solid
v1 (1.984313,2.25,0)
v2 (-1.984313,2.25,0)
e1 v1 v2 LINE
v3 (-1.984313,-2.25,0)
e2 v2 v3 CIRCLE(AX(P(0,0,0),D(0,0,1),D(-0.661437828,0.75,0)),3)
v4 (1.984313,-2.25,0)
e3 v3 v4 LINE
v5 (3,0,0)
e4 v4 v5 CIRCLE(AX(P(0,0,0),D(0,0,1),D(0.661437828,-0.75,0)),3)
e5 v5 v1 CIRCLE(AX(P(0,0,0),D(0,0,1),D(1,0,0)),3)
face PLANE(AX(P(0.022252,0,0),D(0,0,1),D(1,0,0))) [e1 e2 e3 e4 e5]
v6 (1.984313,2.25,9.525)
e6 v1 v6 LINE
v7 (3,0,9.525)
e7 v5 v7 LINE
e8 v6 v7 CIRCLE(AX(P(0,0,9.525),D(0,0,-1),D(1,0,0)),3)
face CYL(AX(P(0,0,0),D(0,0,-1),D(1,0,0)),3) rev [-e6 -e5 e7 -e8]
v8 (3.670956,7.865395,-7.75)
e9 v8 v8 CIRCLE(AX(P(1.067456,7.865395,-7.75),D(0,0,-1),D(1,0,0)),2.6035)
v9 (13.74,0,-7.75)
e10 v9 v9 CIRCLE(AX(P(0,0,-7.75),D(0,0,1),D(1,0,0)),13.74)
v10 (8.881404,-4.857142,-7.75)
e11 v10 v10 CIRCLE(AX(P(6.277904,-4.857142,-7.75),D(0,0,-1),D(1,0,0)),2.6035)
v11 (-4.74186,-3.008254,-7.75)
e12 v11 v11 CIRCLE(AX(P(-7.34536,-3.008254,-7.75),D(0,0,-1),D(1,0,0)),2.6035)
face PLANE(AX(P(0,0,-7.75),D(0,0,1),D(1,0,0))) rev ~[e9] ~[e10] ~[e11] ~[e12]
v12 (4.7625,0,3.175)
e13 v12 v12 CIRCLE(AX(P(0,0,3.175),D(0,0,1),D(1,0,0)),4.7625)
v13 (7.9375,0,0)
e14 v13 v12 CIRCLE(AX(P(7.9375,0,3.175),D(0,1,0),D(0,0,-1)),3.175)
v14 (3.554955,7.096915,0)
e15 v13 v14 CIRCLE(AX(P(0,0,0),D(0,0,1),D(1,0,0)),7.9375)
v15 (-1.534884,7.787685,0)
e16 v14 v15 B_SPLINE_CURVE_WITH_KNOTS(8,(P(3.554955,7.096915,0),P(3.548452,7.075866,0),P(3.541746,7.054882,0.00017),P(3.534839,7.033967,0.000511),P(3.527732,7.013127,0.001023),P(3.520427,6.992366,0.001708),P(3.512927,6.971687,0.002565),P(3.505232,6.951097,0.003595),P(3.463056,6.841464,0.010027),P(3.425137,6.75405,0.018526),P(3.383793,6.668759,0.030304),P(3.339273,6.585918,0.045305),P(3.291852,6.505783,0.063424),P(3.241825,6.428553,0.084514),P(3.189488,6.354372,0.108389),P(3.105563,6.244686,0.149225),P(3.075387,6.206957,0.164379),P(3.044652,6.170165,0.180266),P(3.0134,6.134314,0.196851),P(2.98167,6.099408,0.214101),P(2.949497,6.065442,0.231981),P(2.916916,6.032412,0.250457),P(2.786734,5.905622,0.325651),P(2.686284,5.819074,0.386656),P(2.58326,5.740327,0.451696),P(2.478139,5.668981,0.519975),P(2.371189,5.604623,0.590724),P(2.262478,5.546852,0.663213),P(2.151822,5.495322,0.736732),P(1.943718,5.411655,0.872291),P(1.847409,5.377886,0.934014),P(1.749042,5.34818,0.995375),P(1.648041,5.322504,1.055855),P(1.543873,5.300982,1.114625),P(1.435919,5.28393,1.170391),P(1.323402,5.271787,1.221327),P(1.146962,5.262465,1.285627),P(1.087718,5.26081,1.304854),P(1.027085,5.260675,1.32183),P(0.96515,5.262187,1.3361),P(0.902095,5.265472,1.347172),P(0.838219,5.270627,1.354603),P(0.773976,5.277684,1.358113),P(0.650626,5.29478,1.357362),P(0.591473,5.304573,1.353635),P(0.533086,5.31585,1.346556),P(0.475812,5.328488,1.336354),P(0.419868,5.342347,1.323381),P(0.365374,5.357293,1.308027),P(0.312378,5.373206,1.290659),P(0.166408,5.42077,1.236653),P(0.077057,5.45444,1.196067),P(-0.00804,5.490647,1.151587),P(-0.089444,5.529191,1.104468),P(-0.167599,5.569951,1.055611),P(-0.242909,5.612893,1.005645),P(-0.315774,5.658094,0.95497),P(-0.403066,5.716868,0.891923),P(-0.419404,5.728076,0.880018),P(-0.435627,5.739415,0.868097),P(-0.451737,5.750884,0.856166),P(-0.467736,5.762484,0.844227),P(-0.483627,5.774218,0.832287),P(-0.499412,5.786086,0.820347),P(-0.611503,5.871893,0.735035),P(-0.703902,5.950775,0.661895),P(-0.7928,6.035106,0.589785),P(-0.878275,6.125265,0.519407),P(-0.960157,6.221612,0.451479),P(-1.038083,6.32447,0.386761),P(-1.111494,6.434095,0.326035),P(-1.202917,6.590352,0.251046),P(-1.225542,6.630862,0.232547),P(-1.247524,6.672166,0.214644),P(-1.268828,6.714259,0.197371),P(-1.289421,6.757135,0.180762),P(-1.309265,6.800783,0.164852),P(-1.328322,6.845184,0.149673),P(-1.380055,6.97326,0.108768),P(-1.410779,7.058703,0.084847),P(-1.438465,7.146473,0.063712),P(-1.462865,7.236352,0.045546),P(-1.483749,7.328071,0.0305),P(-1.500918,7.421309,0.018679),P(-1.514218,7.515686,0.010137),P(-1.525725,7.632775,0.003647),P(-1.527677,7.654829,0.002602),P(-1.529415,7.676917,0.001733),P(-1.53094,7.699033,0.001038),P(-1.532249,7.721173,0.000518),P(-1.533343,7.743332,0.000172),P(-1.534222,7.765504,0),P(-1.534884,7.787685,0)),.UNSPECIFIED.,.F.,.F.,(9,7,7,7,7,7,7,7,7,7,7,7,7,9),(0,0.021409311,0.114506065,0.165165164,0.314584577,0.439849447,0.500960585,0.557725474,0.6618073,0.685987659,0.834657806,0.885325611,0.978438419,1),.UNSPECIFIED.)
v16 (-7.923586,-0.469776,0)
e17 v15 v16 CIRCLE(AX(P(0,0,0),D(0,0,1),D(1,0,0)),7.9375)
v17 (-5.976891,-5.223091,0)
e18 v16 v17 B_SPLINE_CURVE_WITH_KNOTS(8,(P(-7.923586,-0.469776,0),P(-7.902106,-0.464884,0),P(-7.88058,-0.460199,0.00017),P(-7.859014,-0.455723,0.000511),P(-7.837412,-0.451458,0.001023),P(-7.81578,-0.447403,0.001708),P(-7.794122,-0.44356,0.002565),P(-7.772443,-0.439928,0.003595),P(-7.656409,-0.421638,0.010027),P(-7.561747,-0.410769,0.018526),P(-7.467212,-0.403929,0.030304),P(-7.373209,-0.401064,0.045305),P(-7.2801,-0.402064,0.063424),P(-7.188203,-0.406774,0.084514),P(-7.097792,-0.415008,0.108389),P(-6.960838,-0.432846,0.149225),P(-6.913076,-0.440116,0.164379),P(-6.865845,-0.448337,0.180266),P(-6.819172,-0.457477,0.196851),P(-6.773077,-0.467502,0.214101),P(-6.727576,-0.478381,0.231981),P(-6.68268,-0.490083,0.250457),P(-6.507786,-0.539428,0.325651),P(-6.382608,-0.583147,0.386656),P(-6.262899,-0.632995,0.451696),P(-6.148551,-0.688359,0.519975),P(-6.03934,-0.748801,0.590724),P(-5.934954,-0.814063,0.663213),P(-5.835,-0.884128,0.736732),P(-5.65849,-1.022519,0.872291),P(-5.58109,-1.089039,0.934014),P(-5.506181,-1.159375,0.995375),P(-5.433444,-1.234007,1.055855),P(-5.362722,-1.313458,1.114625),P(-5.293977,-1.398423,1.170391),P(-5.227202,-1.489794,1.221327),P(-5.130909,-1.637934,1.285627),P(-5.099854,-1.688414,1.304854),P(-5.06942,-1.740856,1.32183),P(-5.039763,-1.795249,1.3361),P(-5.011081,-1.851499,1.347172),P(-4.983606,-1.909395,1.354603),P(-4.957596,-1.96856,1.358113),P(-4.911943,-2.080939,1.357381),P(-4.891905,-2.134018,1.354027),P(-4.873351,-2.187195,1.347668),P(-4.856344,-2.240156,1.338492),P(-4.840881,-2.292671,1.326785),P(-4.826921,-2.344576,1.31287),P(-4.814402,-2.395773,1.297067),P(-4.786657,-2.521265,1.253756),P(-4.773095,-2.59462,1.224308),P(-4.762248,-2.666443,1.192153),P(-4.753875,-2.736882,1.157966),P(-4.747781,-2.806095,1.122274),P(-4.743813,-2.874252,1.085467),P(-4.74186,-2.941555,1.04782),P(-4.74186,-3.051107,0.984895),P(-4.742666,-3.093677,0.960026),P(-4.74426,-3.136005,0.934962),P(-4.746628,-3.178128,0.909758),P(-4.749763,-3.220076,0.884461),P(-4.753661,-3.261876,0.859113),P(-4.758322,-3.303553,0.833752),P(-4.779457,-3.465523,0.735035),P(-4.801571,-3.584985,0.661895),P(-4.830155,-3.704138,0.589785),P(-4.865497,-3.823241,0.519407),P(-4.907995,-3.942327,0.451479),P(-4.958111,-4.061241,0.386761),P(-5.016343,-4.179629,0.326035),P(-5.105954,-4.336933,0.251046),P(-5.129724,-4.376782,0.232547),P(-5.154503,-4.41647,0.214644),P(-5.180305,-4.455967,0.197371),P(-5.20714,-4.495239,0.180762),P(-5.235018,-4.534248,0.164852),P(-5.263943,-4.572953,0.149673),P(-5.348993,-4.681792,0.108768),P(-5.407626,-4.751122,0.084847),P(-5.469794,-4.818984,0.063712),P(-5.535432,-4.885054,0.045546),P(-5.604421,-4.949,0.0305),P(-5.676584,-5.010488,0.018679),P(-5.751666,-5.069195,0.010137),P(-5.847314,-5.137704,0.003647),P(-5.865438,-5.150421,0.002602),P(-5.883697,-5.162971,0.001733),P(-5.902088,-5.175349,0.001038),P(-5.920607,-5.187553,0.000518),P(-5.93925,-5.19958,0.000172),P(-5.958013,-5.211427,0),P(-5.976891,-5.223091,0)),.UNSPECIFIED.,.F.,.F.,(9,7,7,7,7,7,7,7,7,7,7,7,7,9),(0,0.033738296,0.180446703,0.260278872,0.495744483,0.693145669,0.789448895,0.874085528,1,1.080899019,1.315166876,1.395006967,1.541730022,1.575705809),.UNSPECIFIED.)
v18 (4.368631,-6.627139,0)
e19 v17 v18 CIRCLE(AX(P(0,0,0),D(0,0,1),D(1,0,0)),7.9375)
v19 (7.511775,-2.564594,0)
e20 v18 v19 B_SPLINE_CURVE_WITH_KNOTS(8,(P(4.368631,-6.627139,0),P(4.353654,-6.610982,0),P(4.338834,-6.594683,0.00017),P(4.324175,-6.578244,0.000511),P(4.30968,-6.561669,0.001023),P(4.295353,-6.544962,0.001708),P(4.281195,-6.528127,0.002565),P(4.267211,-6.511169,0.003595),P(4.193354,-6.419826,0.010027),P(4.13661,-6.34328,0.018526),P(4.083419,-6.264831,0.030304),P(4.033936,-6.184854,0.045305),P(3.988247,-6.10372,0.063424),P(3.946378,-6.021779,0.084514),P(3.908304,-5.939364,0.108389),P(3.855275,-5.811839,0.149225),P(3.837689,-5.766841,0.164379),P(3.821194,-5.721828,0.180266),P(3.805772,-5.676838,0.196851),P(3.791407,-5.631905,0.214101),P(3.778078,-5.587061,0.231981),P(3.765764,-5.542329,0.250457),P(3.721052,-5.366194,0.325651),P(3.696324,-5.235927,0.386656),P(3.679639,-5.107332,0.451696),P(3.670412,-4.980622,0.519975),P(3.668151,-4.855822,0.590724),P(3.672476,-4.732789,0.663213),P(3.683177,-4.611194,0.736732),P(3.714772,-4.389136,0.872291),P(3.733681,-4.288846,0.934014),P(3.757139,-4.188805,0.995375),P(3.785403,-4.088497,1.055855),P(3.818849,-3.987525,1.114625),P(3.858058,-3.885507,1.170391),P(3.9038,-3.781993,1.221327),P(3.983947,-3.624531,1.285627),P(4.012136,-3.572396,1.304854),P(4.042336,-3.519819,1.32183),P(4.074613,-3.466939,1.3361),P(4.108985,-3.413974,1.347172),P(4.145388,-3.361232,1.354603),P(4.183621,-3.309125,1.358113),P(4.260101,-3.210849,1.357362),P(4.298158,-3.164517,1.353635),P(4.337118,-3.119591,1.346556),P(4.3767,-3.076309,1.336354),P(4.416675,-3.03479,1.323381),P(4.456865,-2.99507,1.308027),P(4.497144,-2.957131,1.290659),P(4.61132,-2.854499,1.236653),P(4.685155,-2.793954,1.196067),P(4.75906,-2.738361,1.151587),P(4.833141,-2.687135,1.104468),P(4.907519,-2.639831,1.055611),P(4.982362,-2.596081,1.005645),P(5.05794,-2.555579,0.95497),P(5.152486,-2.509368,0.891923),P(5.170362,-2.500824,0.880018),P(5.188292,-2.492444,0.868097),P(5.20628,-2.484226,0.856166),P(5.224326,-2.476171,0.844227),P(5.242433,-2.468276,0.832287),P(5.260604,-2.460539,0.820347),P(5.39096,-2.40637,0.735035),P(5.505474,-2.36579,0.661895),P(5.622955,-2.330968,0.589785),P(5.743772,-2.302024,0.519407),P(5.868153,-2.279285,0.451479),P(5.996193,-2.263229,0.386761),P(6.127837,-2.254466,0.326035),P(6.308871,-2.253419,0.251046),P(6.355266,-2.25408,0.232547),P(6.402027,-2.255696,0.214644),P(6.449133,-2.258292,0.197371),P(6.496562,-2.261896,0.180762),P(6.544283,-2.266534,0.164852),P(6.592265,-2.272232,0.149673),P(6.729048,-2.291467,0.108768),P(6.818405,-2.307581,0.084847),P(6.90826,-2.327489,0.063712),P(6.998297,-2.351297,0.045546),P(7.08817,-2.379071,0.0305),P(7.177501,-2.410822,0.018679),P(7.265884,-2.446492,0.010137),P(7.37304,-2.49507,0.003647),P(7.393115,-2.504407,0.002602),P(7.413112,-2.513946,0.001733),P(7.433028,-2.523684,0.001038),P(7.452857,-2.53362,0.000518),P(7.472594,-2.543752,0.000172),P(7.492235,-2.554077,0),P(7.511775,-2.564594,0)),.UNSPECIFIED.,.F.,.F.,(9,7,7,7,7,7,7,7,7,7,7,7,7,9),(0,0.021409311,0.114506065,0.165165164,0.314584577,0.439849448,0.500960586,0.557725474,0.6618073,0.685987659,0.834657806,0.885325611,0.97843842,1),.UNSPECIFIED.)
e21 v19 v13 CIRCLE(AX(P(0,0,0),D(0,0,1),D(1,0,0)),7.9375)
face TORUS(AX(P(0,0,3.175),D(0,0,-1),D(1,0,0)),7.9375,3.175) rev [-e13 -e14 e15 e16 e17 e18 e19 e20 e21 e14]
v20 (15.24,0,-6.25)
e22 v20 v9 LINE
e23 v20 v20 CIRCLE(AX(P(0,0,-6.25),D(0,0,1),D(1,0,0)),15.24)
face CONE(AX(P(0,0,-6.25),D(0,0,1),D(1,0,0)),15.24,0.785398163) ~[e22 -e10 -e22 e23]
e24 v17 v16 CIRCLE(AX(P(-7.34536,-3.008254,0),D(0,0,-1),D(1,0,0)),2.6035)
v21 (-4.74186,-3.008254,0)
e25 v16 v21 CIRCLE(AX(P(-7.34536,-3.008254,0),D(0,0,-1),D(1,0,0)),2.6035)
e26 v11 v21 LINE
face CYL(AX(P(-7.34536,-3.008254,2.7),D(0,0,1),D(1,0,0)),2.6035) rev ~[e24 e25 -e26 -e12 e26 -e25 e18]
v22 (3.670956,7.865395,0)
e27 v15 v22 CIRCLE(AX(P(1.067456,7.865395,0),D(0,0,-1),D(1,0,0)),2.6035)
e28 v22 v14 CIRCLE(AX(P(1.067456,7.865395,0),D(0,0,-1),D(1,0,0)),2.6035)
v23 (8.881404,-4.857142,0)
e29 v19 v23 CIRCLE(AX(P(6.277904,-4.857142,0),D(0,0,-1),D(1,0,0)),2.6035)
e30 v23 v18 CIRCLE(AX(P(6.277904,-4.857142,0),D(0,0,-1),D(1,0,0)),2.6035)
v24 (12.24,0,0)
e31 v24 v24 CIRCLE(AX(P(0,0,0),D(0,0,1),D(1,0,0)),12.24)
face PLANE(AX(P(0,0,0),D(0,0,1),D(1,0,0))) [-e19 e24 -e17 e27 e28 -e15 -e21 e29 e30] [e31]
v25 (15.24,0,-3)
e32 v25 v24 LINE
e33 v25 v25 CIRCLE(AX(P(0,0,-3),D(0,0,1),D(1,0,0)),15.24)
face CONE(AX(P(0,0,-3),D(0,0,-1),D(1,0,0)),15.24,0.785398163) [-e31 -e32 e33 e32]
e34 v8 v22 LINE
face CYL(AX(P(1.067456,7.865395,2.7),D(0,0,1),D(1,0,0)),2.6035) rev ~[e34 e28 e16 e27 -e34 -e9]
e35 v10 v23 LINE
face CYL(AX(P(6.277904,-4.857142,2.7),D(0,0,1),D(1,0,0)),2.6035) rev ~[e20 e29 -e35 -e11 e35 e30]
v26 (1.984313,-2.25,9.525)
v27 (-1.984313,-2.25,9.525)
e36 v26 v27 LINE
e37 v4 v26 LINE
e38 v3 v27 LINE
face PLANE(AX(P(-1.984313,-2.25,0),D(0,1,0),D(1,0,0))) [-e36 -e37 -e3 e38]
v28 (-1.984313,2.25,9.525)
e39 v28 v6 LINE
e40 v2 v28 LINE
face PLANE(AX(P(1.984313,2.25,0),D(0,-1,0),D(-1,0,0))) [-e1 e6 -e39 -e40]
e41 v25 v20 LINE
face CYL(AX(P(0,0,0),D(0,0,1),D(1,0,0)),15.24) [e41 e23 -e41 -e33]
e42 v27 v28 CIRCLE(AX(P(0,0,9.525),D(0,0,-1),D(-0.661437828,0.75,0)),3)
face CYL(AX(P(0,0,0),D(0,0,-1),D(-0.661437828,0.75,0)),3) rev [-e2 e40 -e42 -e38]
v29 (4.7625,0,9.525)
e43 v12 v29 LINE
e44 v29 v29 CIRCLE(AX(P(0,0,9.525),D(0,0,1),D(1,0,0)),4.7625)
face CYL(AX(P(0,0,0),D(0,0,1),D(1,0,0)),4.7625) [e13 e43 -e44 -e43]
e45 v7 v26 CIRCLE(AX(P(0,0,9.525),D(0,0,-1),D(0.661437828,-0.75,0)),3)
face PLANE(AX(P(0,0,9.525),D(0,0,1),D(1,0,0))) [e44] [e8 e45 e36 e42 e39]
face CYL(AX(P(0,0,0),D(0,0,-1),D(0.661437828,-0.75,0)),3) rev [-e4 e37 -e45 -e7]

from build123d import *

# Parameters (mm, degrees)
F0_R          = 4.7625
F1_DEPTH      = 9.525
F1_DEPTH_BACK = 6.35
F3_DEPTH      = 9.526
F4_R          = 15.24
F5_DEPTH      = 7.75
F6_R          = 2.6035
F7_DEPTH      = 13.97
F8_SIZE       = 1.5
F9_SIZE       = 3
F10_S5_R      = 2.6035
F10_T6_DEPTH  = 14
F10_S7_R      = 2.6035
F10_T8_DEPTH  = 14
F10_S9_R      = 2.6035
F10_T10_DEPTH = 14


# Not quite as in the source:
# - a fillet or chamfer that OpenCascade refuses, or shapes differently, is made with other operations: its cross-section is extruded or revolved along the edge and cut away or added


with BuildPart() as f1:
    # F0 (on Top) → F1 (new body, two sides)
    with BuildSketch(Plane.XY) as f1_sk:
        Circle(F0_R)
    extrude(amount=F1_DEPTH)
    extrude(f1_sk.sketch, amount=-F1_DEPTH_BACK)

    # F2 (on Top) → F3 (cut, through all)
    with BuildSketch(Plane.XY):
        with BuildLine():
            ThreePointArc((1.9843134833, -2.25), (2.7343134833, -1.2343134833), (3, 0))
            ThreePointArc((3, 0), (2.7343134833, 1.2343134833), (1.9843134833, 2.25))
            Line((1.9843134833, 2.25), (-1.9843134833, 2.25))
            ThreePointArc((-1.9843134833, 2.25), (-3, 0), (-1.9843134833, -2.25))
            Line((-1.9843134833, -2.25), (1.9843134833, -2.25))
        make_face()
    extrude(amount=F3_DEPTH, mode=Mode.SUBTRACT)

    # F4 (on Top) → F5 (join)
    with BuildSketch(Plane.XY):
        Circle(F4_R)
    extrude(amount=-F5_DEPTH)

    # F6 (on face) → F7 (cut)
    with BuildSketch(Plane(origin=(0, 0, -7.75), x_dir=(1, 0, 0), z_dir=(0, 0, -1))):
        with Locations((1.0674559099, -7.8653953575)):
            Circle(F6_R)
        with Locations((6.2779042355, 4.8571416142)):
            Circle(F6_R)
        with Locations((-7.3453601454, 3.0082537434)):
            Circle(F6_R)
    extrude(amount=-F7_DEPTH, mode=Mode.SUBTRACT)

    # F8
    f8_edges = [f1.edges().sort_by_distance(p)[0] for p in [
        (-15.24, 0, -7.75),
    ]]
    chamfer(f8_edges, length=F8_SIZE)

    # F9
    f9_edges = [f1.edges().sort_by_distance(p)[0] for p in [
        (-15.24, 0, 0),
    ]]
    chamfer(f9_edges, length=F9_SIZE)

    # F10: fillet of radius 3.175 on 1 edges, made by hand


with BuildPart() as f10_tool2:
    # F10_s3 → F10_t4 (revolve)
    with BuildSketch(Plane.XZ):
        with BuildLine():
            ThreePointArc((7.9375, 0), (5.6924359697, 0.9299359697), (4.7625, 3.175))
            Line((4.7625, 3.175), (4.7625, 0))
            Line((4.7625, 0), (7.9375, 0))
        make_face()
    revolve(axis=Axis((0, 0, 0), (0, 0, 1)))

    # F10_s5 → F10_t6 (cut, symmetric)
    with BuildSketch(Plane.XY.offset(2.7)):
        with Locations((-7.3453601454, -3.0082537434)):
            Circle(F10_S5_R)
    extrude(amount=F10_T6_DEPTH, both=True, mode=Mode.SUBTRACT)

    # F10_s7 → F10_t8 (cut, symmetric)
    with BuildSketch(Plane.XY.offset(2.7)):
        with Locations((6.2779042355, -4.8571416142)):
            Circle(F10_S7_R)
    extrude(amount=F10_T8_DEPTH, both=True, mode=Mode.SUBTRACT)

    # F10_s9 → F10_t10 (cut, symmetric)
    with BuildSketch(Plane.XY.offset(2.7)):
        with Locations((1.0674559099, 7.8653953575)):
            Circle(F10_S9_R)
    extrude(amount=F10_T10_DEPTH, both=True, mode=Mode.SUBTRACT)


with BuildPart() as f1_1:
    add(f1.part)

    # F10_t1: union F10_tool2
    add(f10_tool2.part)


solid = f1_1.part
